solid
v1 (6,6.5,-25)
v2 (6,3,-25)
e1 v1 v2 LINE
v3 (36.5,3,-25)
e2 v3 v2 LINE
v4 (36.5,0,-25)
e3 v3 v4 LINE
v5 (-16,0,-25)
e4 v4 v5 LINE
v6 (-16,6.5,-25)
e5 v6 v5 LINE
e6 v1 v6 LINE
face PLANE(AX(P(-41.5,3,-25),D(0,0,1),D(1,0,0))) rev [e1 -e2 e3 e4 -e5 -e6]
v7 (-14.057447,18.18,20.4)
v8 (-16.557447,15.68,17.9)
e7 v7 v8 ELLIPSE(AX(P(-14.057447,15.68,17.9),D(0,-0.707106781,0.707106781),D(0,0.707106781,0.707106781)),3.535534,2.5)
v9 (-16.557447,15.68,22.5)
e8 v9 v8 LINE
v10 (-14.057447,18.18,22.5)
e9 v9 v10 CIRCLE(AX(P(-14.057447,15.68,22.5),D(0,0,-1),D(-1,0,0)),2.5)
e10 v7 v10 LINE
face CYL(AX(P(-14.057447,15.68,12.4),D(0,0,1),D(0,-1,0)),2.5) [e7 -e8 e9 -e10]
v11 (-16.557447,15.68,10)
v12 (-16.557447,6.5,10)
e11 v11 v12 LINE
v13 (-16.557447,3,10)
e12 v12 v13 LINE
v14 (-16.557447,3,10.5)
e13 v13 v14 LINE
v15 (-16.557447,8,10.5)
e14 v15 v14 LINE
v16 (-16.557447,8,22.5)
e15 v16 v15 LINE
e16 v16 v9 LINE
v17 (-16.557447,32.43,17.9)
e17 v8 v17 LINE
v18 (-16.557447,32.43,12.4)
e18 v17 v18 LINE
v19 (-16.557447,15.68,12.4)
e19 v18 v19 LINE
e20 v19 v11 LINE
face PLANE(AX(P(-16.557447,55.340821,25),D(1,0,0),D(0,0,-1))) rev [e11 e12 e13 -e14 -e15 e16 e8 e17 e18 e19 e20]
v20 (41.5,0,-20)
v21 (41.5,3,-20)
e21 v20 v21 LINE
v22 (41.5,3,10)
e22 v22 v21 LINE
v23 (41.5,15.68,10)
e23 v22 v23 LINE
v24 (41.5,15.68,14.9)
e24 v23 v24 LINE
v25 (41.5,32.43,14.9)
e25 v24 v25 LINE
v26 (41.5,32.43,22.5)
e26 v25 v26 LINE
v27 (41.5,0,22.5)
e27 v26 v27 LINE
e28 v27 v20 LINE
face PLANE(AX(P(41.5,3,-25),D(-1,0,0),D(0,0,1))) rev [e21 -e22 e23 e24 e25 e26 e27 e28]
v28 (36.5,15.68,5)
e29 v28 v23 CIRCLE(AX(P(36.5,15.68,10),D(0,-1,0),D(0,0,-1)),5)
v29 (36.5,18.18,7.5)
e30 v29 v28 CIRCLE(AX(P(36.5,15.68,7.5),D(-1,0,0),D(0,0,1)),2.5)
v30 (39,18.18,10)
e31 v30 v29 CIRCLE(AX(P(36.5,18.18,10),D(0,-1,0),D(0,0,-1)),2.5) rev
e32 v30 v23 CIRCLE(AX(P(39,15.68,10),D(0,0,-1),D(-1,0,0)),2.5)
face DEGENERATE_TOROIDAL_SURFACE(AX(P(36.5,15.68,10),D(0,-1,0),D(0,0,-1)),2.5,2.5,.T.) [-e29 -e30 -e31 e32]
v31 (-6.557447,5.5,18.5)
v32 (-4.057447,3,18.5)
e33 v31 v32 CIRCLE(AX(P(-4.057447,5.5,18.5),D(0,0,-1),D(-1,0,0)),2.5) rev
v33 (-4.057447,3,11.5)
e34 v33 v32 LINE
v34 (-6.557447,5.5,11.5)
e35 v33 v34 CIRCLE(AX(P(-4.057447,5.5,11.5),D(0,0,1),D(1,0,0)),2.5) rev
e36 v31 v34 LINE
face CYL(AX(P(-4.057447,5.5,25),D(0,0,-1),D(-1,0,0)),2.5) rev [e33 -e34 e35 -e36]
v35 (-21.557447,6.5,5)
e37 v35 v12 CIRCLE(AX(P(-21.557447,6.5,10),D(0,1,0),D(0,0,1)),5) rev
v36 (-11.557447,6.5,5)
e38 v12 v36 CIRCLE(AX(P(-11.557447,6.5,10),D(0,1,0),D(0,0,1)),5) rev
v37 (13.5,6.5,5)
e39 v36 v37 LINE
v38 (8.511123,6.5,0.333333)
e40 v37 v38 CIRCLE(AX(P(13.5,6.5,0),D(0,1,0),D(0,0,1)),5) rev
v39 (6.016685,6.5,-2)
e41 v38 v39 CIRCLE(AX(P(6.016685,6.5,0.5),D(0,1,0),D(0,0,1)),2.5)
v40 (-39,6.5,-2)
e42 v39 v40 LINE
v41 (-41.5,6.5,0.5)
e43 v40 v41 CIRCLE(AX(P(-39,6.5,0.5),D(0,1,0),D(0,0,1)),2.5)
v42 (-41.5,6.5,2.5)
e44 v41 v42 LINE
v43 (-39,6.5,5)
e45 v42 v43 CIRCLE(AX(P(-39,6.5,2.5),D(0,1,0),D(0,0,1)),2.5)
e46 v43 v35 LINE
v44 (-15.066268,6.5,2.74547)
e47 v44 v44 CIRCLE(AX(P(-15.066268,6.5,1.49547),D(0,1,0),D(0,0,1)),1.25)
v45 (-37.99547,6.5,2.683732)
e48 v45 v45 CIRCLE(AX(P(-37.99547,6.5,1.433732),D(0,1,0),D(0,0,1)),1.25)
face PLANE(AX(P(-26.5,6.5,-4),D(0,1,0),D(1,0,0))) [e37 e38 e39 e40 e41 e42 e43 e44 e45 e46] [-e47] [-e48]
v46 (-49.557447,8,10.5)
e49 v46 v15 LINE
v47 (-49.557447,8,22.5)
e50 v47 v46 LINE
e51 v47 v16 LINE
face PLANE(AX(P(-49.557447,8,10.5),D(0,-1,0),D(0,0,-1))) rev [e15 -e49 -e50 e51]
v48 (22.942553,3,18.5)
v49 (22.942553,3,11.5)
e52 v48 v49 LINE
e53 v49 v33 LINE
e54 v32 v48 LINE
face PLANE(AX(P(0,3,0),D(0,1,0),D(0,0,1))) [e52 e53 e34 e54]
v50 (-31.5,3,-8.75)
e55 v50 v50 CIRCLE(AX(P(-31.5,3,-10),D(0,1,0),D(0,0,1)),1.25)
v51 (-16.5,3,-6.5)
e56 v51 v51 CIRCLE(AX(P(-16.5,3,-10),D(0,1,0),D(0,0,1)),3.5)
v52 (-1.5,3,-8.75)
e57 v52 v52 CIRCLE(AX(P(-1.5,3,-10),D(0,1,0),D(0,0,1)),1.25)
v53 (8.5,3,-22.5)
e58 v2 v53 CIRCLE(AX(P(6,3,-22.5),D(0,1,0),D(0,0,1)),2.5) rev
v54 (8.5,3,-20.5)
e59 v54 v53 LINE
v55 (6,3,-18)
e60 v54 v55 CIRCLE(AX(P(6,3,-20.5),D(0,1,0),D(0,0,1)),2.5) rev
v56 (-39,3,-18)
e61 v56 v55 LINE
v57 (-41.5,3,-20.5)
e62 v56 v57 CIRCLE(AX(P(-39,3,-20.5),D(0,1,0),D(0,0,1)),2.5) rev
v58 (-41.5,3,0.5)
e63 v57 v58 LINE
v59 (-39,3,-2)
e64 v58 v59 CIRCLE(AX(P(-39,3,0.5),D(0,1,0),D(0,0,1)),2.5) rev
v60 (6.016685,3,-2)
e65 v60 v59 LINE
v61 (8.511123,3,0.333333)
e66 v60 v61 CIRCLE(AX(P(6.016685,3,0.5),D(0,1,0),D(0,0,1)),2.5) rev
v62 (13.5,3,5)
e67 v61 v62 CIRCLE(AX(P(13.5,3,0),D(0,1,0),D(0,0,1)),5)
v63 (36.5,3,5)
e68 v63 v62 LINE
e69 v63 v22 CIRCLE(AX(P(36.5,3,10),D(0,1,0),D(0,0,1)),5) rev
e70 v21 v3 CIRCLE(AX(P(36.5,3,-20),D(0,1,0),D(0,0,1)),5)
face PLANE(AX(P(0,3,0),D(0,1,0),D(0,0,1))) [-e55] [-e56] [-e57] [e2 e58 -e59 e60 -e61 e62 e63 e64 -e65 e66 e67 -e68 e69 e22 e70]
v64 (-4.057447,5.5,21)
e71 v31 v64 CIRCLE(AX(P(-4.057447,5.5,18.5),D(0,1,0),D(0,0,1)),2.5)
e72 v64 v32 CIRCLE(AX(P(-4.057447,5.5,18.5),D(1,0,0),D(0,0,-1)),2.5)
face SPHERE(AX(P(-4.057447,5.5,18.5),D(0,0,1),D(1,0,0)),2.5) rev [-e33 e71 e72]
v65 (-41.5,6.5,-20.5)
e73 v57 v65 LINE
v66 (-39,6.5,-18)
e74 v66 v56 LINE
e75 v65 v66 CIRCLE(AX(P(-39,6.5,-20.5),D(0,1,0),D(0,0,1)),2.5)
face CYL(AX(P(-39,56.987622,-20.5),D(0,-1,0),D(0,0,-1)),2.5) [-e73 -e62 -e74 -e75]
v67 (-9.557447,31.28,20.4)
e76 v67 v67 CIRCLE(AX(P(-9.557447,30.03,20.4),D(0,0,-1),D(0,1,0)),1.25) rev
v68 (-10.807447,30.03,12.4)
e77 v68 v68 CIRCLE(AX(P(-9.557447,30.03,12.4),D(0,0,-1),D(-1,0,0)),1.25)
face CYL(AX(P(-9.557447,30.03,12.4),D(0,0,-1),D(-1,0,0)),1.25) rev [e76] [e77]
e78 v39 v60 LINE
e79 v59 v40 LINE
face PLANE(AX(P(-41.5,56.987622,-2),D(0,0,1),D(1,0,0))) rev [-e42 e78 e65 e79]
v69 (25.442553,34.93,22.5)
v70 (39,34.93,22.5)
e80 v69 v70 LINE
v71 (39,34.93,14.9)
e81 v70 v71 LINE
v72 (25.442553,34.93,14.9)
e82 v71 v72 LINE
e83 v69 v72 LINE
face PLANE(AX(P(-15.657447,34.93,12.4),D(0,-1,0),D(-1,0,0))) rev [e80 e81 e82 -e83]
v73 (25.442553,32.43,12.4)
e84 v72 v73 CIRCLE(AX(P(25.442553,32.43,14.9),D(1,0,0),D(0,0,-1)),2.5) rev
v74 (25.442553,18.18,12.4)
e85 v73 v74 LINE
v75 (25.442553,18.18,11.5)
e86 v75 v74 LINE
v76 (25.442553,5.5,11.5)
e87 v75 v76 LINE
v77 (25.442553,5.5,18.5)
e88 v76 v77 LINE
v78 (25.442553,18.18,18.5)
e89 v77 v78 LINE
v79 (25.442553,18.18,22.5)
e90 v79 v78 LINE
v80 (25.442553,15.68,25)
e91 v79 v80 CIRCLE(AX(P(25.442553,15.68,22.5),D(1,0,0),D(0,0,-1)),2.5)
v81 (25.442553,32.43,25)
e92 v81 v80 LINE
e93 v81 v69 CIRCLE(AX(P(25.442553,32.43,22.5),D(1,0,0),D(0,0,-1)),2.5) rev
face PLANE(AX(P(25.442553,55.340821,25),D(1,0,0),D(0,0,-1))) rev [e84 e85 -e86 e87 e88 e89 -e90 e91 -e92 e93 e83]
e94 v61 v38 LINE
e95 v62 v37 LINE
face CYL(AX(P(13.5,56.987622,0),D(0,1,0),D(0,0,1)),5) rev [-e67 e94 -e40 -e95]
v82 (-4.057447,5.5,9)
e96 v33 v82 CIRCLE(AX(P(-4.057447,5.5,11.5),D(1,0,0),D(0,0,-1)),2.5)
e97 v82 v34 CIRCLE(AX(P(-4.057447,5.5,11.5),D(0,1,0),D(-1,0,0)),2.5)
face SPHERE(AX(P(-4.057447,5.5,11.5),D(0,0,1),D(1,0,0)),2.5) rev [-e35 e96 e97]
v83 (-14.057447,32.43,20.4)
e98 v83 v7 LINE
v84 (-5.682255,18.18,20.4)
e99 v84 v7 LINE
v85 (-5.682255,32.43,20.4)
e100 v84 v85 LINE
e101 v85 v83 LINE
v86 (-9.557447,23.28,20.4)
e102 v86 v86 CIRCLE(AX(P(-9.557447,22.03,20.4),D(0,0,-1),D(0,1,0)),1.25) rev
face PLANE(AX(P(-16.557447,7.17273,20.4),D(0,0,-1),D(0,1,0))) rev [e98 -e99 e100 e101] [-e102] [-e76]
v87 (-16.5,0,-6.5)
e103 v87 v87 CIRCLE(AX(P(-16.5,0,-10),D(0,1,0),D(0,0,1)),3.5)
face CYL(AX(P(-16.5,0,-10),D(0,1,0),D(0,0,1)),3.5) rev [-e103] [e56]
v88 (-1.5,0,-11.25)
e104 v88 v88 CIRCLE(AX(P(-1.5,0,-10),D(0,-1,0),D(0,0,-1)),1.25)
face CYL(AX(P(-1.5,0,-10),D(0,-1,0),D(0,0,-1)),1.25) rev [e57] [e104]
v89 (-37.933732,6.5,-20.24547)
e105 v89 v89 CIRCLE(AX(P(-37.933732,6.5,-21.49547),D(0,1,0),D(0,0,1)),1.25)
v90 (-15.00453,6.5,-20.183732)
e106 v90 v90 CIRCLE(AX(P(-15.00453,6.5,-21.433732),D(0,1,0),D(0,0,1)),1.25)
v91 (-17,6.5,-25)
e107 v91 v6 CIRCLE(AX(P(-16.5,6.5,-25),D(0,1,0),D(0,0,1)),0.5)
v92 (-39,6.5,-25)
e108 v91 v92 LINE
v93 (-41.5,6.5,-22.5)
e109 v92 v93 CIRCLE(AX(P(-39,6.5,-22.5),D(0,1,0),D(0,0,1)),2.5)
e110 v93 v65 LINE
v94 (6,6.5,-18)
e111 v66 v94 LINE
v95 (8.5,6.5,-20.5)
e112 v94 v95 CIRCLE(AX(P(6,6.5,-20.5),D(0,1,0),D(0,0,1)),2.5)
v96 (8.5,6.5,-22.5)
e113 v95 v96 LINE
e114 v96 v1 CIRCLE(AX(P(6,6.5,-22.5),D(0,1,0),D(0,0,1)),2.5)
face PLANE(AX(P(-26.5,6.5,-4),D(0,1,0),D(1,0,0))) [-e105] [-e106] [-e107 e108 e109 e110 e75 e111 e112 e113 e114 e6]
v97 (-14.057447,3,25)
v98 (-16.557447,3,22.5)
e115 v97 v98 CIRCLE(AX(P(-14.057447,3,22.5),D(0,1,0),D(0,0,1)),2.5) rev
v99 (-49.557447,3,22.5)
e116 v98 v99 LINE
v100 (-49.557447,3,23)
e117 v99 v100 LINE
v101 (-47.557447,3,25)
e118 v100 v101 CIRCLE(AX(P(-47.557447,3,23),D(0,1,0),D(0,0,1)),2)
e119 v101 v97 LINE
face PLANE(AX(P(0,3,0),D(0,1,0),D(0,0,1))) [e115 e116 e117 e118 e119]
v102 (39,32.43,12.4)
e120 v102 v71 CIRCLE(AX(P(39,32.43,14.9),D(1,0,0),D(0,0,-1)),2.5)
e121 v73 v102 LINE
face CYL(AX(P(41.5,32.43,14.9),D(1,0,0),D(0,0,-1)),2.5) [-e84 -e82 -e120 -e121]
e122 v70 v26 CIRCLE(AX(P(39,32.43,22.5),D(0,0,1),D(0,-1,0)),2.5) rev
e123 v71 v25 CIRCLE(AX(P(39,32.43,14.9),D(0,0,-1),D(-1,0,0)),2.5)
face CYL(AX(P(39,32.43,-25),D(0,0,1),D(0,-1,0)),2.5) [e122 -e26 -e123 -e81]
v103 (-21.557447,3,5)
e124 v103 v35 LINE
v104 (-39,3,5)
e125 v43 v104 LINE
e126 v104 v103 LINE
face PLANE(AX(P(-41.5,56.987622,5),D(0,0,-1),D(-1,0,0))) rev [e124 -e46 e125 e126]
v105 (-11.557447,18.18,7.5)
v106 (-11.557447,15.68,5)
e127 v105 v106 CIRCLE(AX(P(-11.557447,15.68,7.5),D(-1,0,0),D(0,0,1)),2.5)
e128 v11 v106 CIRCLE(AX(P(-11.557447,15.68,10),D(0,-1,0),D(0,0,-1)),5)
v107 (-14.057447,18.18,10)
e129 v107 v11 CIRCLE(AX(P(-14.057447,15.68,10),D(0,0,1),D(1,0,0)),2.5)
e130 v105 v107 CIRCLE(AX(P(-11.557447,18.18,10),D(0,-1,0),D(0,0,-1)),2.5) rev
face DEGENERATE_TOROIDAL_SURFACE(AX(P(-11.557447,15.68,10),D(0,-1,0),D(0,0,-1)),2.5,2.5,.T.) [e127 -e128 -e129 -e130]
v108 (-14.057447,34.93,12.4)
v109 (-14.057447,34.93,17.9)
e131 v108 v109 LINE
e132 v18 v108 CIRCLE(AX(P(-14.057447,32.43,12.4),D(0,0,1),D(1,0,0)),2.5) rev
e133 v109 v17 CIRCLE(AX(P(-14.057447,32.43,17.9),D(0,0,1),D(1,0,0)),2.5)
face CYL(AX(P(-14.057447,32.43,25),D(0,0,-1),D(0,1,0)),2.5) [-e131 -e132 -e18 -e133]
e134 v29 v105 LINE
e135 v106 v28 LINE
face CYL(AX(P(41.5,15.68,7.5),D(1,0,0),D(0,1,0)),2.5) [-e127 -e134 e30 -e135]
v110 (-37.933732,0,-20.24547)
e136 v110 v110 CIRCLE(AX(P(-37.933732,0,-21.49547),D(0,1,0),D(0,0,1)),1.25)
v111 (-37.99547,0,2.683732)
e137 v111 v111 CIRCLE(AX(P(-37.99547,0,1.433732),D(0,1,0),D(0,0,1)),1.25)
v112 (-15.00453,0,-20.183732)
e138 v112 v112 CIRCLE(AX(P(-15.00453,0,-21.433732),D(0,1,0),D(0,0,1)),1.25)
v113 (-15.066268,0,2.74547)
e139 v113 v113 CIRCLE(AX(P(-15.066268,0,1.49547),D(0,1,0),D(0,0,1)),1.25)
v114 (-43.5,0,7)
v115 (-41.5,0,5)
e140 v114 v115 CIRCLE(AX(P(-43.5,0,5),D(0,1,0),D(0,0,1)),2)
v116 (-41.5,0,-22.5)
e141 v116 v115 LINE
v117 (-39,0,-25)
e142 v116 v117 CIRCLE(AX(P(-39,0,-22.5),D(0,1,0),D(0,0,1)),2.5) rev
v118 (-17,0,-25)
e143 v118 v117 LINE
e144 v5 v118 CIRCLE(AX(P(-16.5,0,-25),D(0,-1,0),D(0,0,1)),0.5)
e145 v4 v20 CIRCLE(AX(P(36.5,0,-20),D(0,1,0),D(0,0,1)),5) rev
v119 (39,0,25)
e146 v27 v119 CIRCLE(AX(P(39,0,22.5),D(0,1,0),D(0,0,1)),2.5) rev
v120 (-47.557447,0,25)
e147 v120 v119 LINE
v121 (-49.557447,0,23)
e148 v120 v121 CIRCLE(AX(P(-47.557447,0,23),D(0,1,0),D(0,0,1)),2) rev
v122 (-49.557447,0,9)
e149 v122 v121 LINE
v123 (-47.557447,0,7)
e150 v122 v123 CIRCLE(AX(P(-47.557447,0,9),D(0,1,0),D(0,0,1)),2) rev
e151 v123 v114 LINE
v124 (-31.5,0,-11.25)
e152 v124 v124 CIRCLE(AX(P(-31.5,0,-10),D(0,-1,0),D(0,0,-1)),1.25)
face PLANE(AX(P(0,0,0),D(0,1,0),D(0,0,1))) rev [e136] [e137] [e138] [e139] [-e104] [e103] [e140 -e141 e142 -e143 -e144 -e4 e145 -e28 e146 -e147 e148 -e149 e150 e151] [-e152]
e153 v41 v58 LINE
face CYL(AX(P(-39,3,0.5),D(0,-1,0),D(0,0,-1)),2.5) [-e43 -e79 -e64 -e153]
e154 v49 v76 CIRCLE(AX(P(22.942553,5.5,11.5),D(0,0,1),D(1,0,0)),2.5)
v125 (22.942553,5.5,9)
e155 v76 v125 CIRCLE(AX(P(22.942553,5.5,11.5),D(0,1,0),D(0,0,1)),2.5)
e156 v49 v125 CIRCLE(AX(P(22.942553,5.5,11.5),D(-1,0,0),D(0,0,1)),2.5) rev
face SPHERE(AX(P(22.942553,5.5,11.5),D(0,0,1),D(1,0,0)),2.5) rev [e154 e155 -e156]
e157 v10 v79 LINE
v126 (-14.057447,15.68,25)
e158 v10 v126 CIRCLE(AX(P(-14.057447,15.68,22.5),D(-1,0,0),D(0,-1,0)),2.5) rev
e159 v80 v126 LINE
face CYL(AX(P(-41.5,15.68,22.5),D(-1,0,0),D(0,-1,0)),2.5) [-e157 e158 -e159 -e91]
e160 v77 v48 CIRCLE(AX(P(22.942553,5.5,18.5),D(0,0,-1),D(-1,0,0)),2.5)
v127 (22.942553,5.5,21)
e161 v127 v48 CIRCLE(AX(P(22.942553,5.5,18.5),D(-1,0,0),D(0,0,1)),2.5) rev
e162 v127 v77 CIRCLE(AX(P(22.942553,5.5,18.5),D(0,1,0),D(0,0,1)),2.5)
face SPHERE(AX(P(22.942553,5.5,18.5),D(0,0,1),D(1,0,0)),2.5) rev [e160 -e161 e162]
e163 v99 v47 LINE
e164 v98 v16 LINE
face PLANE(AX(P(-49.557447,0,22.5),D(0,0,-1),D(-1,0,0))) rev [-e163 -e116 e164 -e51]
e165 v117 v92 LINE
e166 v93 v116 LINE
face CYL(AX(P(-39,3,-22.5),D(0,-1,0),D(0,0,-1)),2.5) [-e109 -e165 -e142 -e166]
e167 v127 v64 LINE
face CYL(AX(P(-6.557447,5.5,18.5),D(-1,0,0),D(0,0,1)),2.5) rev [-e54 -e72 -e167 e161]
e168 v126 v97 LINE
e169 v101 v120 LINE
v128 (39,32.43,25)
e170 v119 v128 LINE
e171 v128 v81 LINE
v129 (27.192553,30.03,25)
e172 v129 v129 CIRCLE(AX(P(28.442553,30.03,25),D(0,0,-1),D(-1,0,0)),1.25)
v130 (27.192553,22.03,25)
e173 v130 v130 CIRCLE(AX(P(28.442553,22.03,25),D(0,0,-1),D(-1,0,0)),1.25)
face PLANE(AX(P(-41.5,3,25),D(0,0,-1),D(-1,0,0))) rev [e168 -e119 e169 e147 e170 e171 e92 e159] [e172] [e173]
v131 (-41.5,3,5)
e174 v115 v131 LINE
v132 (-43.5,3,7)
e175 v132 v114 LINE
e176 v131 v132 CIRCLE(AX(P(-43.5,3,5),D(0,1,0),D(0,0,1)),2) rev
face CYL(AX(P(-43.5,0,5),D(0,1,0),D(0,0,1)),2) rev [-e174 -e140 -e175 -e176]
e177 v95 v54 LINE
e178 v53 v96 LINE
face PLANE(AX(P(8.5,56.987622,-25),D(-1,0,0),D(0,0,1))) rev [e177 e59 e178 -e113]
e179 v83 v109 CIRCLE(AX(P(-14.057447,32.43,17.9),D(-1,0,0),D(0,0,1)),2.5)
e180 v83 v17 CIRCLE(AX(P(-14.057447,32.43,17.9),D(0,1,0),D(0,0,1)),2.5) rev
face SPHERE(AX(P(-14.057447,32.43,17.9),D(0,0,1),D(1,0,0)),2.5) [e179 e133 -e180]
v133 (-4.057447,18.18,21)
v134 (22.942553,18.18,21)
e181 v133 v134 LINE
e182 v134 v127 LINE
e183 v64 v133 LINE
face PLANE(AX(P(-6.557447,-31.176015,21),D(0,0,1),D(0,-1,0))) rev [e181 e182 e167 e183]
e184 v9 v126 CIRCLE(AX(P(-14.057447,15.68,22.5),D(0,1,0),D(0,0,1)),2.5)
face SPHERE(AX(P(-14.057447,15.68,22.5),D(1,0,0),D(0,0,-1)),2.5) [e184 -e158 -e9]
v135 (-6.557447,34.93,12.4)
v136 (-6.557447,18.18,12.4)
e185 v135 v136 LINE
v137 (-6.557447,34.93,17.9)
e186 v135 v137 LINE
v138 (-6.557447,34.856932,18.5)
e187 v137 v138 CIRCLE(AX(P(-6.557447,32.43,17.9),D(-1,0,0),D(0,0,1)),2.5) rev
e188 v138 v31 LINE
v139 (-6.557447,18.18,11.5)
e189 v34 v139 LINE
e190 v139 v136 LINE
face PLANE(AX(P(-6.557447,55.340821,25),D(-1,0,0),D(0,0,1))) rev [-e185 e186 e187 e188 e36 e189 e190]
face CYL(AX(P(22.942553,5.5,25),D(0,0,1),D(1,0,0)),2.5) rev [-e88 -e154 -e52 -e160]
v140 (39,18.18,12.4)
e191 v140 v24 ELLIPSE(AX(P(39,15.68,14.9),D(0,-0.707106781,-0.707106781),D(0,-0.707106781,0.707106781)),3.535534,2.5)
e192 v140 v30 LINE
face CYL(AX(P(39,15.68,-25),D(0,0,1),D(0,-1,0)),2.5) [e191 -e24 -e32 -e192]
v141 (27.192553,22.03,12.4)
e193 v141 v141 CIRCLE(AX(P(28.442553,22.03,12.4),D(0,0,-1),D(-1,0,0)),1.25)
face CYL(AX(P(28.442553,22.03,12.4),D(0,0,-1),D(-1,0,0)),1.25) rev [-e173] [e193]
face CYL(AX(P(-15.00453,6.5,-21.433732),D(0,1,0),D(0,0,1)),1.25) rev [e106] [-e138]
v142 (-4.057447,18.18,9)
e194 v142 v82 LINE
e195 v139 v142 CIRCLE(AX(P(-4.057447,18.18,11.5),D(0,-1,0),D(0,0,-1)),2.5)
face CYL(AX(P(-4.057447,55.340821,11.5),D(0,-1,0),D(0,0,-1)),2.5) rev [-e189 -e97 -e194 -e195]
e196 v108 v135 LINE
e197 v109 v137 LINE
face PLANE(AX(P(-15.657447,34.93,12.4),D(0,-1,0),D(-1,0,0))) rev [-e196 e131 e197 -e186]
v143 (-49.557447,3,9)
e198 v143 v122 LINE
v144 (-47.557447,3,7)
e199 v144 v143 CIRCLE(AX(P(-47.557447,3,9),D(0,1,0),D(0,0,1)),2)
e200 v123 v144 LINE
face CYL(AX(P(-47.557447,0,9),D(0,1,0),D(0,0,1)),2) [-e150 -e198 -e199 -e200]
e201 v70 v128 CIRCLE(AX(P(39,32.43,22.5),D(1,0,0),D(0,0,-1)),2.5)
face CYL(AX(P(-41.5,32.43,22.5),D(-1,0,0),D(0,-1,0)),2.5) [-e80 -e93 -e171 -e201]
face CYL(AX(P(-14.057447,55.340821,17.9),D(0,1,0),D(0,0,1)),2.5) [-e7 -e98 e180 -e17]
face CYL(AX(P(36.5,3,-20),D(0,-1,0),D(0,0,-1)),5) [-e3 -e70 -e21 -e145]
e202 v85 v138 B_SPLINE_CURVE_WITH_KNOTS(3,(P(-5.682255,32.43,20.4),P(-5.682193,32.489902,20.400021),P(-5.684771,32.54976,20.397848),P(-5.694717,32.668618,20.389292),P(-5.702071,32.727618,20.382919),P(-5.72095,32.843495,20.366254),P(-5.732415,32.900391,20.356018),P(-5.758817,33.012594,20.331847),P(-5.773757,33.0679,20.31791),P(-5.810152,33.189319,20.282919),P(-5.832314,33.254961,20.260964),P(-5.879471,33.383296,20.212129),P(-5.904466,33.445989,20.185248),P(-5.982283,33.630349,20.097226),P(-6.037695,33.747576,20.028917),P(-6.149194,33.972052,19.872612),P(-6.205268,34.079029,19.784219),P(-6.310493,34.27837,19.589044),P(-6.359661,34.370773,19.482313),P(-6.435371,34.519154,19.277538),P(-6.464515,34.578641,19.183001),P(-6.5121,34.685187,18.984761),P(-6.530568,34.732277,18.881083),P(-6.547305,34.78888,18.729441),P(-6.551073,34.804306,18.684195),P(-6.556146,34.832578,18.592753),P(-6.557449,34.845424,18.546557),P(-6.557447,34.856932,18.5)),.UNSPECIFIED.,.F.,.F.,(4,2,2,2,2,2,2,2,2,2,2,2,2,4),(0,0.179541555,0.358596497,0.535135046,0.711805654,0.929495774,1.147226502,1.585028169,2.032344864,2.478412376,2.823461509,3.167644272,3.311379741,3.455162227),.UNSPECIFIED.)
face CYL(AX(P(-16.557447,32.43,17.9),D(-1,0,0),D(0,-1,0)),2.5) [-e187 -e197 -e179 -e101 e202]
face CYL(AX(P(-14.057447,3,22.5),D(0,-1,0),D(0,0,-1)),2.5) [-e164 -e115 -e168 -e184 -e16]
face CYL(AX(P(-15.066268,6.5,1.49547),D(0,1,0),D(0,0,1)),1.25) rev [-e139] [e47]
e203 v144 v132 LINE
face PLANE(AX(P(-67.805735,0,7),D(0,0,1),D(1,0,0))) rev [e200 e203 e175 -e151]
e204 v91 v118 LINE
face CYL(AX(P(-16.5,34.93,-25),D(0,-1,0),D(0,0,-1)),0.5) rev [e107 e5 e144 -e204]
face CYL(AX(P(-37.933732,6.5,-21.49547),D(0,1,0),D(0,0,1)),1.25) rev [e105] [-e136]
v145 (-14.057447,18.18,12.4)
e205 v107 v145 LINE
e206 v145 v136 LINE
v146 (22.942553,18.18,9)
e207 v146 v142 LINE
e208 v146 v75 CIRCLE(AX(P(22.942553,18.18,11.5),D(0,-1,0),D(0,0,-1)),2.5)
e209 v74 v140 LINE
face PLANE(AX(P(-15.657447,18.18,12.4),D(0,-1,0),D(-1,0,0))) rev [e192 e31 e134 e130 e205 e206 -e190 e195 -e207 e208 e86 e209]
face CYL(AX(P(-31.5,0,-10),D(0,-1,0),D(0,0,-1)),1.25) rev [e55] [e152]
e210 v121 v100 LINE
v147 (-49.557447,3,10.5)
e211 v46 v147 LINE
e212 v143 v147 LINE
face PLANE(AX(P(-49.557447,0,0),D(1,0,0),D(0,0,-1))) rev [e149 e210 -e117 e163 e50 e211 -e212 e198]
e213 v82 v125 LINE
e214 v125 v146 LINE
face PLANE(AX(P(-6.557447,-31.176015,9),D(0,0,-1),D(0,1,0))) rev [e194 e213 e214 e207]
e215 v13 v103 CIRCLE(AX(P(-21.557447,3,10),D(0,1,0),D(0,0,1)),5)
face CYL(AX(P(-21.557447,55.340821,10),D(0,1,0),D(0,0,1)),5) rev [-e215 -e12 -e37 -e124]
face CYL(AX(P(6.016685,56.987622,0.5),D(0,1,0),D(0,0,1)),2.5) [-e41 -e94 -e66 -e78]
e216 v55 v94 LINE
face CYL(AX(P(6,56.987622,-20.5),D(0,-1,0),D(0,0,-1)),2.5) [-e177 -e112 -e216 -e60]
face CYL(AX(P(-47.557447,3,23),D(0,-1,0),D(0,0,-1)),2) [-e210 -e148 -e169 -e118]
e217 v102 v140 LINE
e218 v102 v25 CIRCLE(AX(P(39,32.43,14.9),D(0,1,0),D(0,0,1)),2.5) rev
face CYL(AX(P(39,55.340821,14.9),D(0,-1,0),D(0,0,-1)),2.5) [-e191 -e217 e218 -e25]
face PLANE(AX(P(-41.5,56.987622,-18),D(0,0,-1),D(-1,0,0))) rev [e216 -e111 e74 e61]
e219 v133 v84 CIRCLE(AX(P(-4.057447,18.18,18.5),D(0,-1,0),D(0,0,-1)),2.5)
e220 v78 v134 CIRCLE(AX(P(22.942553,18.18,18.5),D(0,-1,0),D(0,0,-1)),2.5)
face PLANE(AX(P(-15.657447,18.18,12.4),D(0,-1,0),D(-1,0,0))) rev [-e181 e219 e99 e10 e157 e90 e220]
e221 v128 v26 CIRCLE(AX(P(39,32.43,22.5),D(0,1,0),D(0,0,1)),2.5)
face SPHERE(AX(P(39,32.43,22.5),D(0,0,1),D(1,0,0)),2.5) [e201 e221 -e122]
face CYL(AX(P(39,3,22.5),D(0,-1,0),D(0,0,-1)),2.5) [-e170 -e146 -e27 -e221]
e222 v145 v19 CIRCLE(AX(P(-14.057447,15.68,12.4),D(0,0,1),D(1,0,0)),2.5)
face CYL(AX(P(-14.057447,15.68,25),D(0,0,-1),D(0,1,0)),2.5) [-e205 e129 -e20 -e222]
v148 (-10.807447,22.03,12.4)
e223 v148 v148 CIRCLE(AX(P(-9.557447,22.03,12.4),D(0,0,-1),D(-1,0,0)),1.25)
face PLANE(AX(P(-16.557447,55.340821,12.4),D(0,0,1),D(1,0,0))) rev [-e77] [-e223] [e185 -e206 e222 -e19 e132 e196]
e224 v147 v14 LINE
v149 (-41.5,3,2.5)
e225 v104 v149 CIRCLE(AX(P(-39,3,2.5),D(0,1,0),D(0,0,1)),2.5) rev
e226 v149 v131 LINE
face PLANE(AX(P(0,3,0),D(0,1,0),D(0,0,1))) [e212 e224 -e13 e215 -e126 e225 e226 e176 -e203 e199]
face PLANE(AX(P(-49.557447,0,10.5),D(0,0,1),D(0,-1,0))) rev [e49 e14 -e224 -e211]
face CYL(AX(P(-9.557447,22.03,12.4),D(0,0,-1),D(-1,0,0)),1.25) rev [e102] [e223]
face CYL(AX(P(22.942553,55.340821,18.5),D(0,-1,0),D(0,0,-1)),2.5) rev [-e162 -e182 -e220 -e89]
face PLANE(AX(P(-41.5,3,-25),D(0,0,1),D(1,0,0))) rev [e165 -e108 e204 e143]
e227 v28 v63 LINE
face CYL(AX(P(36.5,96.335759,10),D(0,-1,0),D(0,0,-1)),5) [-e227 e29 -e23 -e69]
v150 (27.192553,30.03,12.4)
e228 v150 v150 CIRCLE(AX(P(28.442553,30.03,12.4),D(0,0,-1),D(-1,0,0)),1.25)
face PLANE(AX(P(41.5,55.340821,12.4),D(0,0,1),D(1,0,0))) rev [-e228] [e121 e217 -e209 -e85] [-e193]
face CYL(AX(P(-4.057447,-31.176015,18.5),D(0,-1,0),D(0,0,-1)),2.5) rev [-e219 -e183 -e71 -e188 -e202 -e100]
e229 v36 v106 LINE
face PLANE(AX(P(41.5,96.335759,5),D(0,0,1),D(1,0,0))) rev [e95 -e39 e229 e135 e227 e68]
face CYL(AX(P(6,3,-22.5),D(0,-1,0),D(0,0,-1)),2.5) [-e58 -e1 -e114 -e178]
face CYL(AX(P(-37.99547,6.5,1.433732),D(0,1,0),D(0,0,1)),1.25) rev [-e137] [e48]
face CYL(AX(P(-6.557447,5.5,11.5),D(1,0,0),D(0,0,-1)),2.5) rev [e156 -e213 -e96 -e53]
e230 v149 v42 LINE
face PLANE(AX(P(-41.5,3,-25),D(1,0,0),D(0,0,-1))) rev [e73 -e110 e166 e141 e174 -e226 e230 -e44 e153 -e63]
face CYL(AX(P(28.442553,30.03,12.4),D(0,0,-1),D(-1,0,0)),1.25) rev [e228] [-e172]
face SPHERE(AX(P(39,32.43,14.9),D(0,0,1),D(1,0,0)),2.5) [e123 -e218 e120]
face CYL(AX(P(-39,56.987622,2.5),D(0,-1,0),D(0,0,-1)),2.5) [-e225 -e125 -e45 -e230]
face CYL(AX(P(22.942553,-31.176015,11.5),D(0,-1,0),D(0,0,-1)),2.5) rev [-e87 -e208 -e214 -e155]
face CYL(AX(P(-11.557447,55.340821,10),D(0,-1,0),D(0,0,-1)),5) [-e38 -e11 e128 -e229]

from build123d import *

# Parameters (mm, degrees)
SKETCH1_W             = 83
SKETCH1_H             = 50
BOSS_EXTRUDE1_DEPTH   = 3
SKETCH2_W             = 50
SKETCH2_H             = 7
BOSS_EXTRUDE2_DEPTH   = 3.5
SKETCH3_W             = 16.057447236
SKETCH3_H             = 12.6
SKETCH3_W_2           = 10
BOSS_EXTRUDE3_DEPTH   = 31.93
M3X0_5_TAPPED_HOLE1_D = 2.5
SKETCH6_W             = 58.057447236
SKETCH6_H             = 20
BOSS_EXTRUDE4_DEPTH   = 15.18
SKETCH10_W            = 32
SKETCH10_H            = 12
CUT_EXTRUDE2_DEPTH    = 15.18
CUT_EXTRUDE4_REACH    = 61.727
SKETCH12_W            = 10
SKETCH12_H            = 4.6
SKETCH13_W            = 12
SKETCH13_H            = 8
BOSS_EXTRUDE5_DEPTH   = 33
SKETCH14_W            = 18
SKETCH14_H            = 3
BOSS_EXTRUDE6_DEPTH   = 8.057447236
FILLET1_R             = 5
FILLET2_R             = 5
FILLET3_R             = 2.5
FILLET4_R             = 2.5
FILLET5_R             = 2.5
M3X0_5_TAPPED_HOLE2_D = 2.5
SKETCH9_R             = 3.5
CUT_EXTRUDE1_DEPTH    = 65.034877071
FILLET6_R             = 2.5
CUT_EXTRUDE3_DEPTH    = 66.582356534
FILLET7_R             = 2
M3X0_5_TAPPED_HOLE3_D = 2.5


with BuildPart() as part:
    # Sketch1 → Boss-Extrude1 (new body)
    with BuildSketch(Plane(origin=(0, 0, 0), x_dir=(1, 0, 0), z_dir=(0, 1, 0))):
        Rectangle(SKETCH1_W, SKETCH1_H)
    extrude(amount=BOSS_EXTRUDE1_DEPTH)

    # Sketch2 → Boss-Extrude2 (add)
    with BuildSketch(Plane(origin=(0, 3, 0), x_dir=(1, 0, 0), z_dir=(0, 1, 0))):
        with Locations((-16.5, 21.5)):
            Rectangle(SKETCH2_W, SKETCH2_H)
        with Locations((-16.5, -1.5)):
            Rectangle(SKETCH2_W, SKETCH2_H)
    extrude(amount=BOSS_EXTRUDE2_DEPTH)

    # Sketch3 → Boss-Extrude3 (add)
    with BuildSketch(Plane(origin=(0, 3, 0), x_dir=(1, 0, 0), z_dir=(0, 1, 0))):
        with Locations((33.471276382, -18.7)):
            Rectangle(SKETCH3_W, SKETCH3_H)
        with Locations((-11.557447236, -18.7)):
            Rectangle(SKETCH3_W_2, SKETCH3_H)
    extrude(amount=BOSS_EXTRUDE3_DEPTH)

    # M3x0.5 Tapped Hole1 (through all)
    with Locations(Plane(origin=(0, 0, 12.4), x_dir=(-1, 0, 0), z_dir=(0, 0, -1))):
        with Locations((-28.442552764, 30.03), (-28.442552764, 22.03), (9.557447236, 22.03), (9.557447236, 30.03)):
            Hole(M3X0_5_TAPPED_HOLE1_D / 2)

    # Sketch6 → Boss-Extrude4 (add)
    with BuildSketch(Plane(origin=(0, 3, 0), x_dir=(1, 0, 0), z_dir=(0, 1, 0))):
        with Locations((12.471276382, -15)):
            Rectangle(SKETCH6_W, SKETCH6_H)
    extrude(amount=BOSS_EXTRUDE4_DEPTH)

    # Sketch10 → Cut-Extrude2 (cut)
    with BuildSketch(Plane(origin=(0, 18.18, 0), x_dir=(1, 0, 0), z_dir=(0, 1, 0))):
        with Locations((9.442552764, -15)):
            Rectangle(SKETCH10_W, SKETCH10_H)
    extrude(amount=-CUT_EXTRUDE2_DEPTH, mode=Mode.SUBTRACT)

    # Cut-Extrude4: up to this face of the body (flat: up to its plane)
    cut_extrude4_end = Plane(part.part.faces().sort_by_distance((9.442552764, 18.18, 23))[0])
    # Sketch12 → Cut-Extrude4 (cut, up to the picked face)
    with BuildSketch(Plane(origin=(0, 34.93, 0), x_dir=(1, 0, 0), z_dir=(0, 1, 0)), mode=Mode.PRIVATE) as cut_extrude4_sk1:
        with Locations((-11.557447236, -22.7)):
            Rectangle(SKETCH12_W, SKETCH12_H)
    cut_extrude4_tool1 = split(extrude(cut_extrude4_sk1.sketch, amount=-CUT_EXTRUDE4_REACH, mode=Mode.PRIVATE), bisect_by=cut_extrude4_end, keep=Keep.BOTH, mode=Mode.PRIVATE)
    add(cut_extrude4_tool1.solids().sort_by(Axis((-11.557447, 34.93, 22.7), (0, -1, 0)))[0], mode=Mode.SUBTRACT)

    # Sketch13 → Boss-Extrude5 (add)
    with BuildSketch(Plane.ZY.offset(16.557447236)):
        with Locations((16.5, 4)):
            Rectangle(SKETCH13_W, SKETCH13_H)
    extrude(amount=BOSS_EXTRUDE5_DEPTH)

    # Sketch14 → Boss-Extrude6 (add)
    with BuildSketch(Plane.ZY.offset(41.5)):
        with Locations((16, 1.5)):
            Rectangle(SKETCH14_W, SKETCH14_H)
    extrude(amount=BOSS_EXTRUDE6_DEPTH)

    # Fillet1
    fillet1_edges = [part.edges().sort_by_distance(p)[0] for p in [
        (8.5, 4.75, 5),
        (41.5, 10.59, 5),
        (-16.557447236, 4.75, 5),
    ]]
    fillet(fillet1_edges, radius=FILLET1_R)

    # Fillet2
    fillet2_edges = [part.edges().sort_by_distance(p)[0] for p in [
        (-16.557447236, 12.34, 5),
        (41.5, 1.5, -25),
    ]]
    fillet(fillet2_edges, radius=FILLET2_R)

    # Fillet3
    fillet3_edges = [part.edges().sort_by_distance(p)[0] for p in [
        (8.5, 4.75, -18),
        (-41.5, 4.75, -18),
        (-41.5, 4.75, -2),
        (8.5, 4.75, -2),
        (8.5, 4.75, -25),
        (-41.5, 4.75, 5),
        (-41.5, 3.25, -25),
    ]]
    fillet(fillet3_edges, radius=FILLET3_R)

    # Fillet4
    fillet4_edges = [part.edges().sort_by_distance(p)[0] for p in [
        (41.5, 18.18, 11.2),
        (40.035533906, 18.18, 6.464466094),
        (12.471276382, 18.18, 5),
        (-15.092981142, 18.18, 6.464466094),
        (-16.557447236, 18.18, 11.2),
        (4.442552764, 18.18, 25),
    ]]
    fillet(fillet4_edges, radius=FILLET4_R)

    # Fillet5
    fillet5_edges = [part.edges().sort_by_distance(p)[0] for p in [
        (-16.557447236, 34.93, 16.4),
        (-16.557447236, 26.555, 20.4),
        (-11.557447236, 34.93, 20.4),
        (-16.557447236, 18.18, 21.45),
        (-16.557447236, 9.34, 25),
        (33.471276382, 34.93, 25),
        (33.471276382, 34.93, 12.4),
        (41.5, 25.305, 12.4),
        (41.5, 34.93, 18.7),
        (41.5, 17.465, 25),
        (-16.557447236, 17.447766953, 24.267766953),
    ]]
    fillet(fillet5_edges, radius=FILLET5_R - 0.0001)  # a hair under: the kernel refuses the full size

    # M3x0.5 Tapped Hole2 (through all)
    with Locations(Plane(origin=(0, 6.5, 0), x_dir=(1, 0, 0), z_dir=(0, 1, 0))):
        with Locations((-37.99546971, -1.433732), (-15.066268, -1.49546971), (-15.00453029, 21.433732), (-37.933732, 21.49546971)):
            Hole(M3X0_5_TAPPED_HOLE2_D / 2)

    # Sketch9 → Cut-Extrude1 (cut, through all)
    with BuildSketch(Plane(origin=(0, 3, 0), x_dir=(1, 0, 0), z_dir=(0, 1, 0))):
        with Locations(Location((-16.5, 10, 0), (0, 0, 270))):
            Circle(SKETCH9_R)
    extrude(amount=-CUT_EXTRUDE1_DEPTH, mode=Mode.SUBTRACT)

    # Fillet6
    fillet6_edges = [part.edges().sort_by_distance(p)[0] for p in [
        (-6.557447236, 3, 15),
        (9.442552764, 3, 21),
        (25.442552764, 3, 15),
        (9.442552764, 3, 9),
        (25.442552764, 10.59, 21),
        (25.442552764, 10.59, 9),
        (-6.557447236, 10.59, 21),
        (-6.557447236, 10.59, 9),
    ]]
    fillet(fillet6_edges, radius=FILLET6_R)

    # Sketch11 → Cut-Extrude3 (cut, through all)
    with BuildSketch(Plane.XZ):
        with BuildLine():
            Line((-17, -25), (-16, -25))
            ThreePointArc((-16, -25), (-16.5, -24.5), (-17, -25))
        make_face()
    extrude(amount=-CUT_EXTRUDE3_DEPTH, mode=Mode.SUBTRACT)

    # Fillet7
    fillet7_edges = [part.edges().sort_by_distance(p)[0] for p in [
        (-49.557447236, 1.5, 7),
        (-41.5, 1.5, 7),
        (-49.557447236, 1.5, 25),
    ]]
    fillet(fillet7_edges, radius=FILLET7_R)

    # M3x0.5 Tapped Hole3 (through all)
    with Locations(Plane(origin=(0, 0, 0), x_dir=(-1, 0, 0), z_dir=(0, -1, 0))):
        with Locations((1.5, 10), (31.5, 10)):
            Hole(M3X0_5_TAPPED_HOLE3_D / 2)


solid = part.part
